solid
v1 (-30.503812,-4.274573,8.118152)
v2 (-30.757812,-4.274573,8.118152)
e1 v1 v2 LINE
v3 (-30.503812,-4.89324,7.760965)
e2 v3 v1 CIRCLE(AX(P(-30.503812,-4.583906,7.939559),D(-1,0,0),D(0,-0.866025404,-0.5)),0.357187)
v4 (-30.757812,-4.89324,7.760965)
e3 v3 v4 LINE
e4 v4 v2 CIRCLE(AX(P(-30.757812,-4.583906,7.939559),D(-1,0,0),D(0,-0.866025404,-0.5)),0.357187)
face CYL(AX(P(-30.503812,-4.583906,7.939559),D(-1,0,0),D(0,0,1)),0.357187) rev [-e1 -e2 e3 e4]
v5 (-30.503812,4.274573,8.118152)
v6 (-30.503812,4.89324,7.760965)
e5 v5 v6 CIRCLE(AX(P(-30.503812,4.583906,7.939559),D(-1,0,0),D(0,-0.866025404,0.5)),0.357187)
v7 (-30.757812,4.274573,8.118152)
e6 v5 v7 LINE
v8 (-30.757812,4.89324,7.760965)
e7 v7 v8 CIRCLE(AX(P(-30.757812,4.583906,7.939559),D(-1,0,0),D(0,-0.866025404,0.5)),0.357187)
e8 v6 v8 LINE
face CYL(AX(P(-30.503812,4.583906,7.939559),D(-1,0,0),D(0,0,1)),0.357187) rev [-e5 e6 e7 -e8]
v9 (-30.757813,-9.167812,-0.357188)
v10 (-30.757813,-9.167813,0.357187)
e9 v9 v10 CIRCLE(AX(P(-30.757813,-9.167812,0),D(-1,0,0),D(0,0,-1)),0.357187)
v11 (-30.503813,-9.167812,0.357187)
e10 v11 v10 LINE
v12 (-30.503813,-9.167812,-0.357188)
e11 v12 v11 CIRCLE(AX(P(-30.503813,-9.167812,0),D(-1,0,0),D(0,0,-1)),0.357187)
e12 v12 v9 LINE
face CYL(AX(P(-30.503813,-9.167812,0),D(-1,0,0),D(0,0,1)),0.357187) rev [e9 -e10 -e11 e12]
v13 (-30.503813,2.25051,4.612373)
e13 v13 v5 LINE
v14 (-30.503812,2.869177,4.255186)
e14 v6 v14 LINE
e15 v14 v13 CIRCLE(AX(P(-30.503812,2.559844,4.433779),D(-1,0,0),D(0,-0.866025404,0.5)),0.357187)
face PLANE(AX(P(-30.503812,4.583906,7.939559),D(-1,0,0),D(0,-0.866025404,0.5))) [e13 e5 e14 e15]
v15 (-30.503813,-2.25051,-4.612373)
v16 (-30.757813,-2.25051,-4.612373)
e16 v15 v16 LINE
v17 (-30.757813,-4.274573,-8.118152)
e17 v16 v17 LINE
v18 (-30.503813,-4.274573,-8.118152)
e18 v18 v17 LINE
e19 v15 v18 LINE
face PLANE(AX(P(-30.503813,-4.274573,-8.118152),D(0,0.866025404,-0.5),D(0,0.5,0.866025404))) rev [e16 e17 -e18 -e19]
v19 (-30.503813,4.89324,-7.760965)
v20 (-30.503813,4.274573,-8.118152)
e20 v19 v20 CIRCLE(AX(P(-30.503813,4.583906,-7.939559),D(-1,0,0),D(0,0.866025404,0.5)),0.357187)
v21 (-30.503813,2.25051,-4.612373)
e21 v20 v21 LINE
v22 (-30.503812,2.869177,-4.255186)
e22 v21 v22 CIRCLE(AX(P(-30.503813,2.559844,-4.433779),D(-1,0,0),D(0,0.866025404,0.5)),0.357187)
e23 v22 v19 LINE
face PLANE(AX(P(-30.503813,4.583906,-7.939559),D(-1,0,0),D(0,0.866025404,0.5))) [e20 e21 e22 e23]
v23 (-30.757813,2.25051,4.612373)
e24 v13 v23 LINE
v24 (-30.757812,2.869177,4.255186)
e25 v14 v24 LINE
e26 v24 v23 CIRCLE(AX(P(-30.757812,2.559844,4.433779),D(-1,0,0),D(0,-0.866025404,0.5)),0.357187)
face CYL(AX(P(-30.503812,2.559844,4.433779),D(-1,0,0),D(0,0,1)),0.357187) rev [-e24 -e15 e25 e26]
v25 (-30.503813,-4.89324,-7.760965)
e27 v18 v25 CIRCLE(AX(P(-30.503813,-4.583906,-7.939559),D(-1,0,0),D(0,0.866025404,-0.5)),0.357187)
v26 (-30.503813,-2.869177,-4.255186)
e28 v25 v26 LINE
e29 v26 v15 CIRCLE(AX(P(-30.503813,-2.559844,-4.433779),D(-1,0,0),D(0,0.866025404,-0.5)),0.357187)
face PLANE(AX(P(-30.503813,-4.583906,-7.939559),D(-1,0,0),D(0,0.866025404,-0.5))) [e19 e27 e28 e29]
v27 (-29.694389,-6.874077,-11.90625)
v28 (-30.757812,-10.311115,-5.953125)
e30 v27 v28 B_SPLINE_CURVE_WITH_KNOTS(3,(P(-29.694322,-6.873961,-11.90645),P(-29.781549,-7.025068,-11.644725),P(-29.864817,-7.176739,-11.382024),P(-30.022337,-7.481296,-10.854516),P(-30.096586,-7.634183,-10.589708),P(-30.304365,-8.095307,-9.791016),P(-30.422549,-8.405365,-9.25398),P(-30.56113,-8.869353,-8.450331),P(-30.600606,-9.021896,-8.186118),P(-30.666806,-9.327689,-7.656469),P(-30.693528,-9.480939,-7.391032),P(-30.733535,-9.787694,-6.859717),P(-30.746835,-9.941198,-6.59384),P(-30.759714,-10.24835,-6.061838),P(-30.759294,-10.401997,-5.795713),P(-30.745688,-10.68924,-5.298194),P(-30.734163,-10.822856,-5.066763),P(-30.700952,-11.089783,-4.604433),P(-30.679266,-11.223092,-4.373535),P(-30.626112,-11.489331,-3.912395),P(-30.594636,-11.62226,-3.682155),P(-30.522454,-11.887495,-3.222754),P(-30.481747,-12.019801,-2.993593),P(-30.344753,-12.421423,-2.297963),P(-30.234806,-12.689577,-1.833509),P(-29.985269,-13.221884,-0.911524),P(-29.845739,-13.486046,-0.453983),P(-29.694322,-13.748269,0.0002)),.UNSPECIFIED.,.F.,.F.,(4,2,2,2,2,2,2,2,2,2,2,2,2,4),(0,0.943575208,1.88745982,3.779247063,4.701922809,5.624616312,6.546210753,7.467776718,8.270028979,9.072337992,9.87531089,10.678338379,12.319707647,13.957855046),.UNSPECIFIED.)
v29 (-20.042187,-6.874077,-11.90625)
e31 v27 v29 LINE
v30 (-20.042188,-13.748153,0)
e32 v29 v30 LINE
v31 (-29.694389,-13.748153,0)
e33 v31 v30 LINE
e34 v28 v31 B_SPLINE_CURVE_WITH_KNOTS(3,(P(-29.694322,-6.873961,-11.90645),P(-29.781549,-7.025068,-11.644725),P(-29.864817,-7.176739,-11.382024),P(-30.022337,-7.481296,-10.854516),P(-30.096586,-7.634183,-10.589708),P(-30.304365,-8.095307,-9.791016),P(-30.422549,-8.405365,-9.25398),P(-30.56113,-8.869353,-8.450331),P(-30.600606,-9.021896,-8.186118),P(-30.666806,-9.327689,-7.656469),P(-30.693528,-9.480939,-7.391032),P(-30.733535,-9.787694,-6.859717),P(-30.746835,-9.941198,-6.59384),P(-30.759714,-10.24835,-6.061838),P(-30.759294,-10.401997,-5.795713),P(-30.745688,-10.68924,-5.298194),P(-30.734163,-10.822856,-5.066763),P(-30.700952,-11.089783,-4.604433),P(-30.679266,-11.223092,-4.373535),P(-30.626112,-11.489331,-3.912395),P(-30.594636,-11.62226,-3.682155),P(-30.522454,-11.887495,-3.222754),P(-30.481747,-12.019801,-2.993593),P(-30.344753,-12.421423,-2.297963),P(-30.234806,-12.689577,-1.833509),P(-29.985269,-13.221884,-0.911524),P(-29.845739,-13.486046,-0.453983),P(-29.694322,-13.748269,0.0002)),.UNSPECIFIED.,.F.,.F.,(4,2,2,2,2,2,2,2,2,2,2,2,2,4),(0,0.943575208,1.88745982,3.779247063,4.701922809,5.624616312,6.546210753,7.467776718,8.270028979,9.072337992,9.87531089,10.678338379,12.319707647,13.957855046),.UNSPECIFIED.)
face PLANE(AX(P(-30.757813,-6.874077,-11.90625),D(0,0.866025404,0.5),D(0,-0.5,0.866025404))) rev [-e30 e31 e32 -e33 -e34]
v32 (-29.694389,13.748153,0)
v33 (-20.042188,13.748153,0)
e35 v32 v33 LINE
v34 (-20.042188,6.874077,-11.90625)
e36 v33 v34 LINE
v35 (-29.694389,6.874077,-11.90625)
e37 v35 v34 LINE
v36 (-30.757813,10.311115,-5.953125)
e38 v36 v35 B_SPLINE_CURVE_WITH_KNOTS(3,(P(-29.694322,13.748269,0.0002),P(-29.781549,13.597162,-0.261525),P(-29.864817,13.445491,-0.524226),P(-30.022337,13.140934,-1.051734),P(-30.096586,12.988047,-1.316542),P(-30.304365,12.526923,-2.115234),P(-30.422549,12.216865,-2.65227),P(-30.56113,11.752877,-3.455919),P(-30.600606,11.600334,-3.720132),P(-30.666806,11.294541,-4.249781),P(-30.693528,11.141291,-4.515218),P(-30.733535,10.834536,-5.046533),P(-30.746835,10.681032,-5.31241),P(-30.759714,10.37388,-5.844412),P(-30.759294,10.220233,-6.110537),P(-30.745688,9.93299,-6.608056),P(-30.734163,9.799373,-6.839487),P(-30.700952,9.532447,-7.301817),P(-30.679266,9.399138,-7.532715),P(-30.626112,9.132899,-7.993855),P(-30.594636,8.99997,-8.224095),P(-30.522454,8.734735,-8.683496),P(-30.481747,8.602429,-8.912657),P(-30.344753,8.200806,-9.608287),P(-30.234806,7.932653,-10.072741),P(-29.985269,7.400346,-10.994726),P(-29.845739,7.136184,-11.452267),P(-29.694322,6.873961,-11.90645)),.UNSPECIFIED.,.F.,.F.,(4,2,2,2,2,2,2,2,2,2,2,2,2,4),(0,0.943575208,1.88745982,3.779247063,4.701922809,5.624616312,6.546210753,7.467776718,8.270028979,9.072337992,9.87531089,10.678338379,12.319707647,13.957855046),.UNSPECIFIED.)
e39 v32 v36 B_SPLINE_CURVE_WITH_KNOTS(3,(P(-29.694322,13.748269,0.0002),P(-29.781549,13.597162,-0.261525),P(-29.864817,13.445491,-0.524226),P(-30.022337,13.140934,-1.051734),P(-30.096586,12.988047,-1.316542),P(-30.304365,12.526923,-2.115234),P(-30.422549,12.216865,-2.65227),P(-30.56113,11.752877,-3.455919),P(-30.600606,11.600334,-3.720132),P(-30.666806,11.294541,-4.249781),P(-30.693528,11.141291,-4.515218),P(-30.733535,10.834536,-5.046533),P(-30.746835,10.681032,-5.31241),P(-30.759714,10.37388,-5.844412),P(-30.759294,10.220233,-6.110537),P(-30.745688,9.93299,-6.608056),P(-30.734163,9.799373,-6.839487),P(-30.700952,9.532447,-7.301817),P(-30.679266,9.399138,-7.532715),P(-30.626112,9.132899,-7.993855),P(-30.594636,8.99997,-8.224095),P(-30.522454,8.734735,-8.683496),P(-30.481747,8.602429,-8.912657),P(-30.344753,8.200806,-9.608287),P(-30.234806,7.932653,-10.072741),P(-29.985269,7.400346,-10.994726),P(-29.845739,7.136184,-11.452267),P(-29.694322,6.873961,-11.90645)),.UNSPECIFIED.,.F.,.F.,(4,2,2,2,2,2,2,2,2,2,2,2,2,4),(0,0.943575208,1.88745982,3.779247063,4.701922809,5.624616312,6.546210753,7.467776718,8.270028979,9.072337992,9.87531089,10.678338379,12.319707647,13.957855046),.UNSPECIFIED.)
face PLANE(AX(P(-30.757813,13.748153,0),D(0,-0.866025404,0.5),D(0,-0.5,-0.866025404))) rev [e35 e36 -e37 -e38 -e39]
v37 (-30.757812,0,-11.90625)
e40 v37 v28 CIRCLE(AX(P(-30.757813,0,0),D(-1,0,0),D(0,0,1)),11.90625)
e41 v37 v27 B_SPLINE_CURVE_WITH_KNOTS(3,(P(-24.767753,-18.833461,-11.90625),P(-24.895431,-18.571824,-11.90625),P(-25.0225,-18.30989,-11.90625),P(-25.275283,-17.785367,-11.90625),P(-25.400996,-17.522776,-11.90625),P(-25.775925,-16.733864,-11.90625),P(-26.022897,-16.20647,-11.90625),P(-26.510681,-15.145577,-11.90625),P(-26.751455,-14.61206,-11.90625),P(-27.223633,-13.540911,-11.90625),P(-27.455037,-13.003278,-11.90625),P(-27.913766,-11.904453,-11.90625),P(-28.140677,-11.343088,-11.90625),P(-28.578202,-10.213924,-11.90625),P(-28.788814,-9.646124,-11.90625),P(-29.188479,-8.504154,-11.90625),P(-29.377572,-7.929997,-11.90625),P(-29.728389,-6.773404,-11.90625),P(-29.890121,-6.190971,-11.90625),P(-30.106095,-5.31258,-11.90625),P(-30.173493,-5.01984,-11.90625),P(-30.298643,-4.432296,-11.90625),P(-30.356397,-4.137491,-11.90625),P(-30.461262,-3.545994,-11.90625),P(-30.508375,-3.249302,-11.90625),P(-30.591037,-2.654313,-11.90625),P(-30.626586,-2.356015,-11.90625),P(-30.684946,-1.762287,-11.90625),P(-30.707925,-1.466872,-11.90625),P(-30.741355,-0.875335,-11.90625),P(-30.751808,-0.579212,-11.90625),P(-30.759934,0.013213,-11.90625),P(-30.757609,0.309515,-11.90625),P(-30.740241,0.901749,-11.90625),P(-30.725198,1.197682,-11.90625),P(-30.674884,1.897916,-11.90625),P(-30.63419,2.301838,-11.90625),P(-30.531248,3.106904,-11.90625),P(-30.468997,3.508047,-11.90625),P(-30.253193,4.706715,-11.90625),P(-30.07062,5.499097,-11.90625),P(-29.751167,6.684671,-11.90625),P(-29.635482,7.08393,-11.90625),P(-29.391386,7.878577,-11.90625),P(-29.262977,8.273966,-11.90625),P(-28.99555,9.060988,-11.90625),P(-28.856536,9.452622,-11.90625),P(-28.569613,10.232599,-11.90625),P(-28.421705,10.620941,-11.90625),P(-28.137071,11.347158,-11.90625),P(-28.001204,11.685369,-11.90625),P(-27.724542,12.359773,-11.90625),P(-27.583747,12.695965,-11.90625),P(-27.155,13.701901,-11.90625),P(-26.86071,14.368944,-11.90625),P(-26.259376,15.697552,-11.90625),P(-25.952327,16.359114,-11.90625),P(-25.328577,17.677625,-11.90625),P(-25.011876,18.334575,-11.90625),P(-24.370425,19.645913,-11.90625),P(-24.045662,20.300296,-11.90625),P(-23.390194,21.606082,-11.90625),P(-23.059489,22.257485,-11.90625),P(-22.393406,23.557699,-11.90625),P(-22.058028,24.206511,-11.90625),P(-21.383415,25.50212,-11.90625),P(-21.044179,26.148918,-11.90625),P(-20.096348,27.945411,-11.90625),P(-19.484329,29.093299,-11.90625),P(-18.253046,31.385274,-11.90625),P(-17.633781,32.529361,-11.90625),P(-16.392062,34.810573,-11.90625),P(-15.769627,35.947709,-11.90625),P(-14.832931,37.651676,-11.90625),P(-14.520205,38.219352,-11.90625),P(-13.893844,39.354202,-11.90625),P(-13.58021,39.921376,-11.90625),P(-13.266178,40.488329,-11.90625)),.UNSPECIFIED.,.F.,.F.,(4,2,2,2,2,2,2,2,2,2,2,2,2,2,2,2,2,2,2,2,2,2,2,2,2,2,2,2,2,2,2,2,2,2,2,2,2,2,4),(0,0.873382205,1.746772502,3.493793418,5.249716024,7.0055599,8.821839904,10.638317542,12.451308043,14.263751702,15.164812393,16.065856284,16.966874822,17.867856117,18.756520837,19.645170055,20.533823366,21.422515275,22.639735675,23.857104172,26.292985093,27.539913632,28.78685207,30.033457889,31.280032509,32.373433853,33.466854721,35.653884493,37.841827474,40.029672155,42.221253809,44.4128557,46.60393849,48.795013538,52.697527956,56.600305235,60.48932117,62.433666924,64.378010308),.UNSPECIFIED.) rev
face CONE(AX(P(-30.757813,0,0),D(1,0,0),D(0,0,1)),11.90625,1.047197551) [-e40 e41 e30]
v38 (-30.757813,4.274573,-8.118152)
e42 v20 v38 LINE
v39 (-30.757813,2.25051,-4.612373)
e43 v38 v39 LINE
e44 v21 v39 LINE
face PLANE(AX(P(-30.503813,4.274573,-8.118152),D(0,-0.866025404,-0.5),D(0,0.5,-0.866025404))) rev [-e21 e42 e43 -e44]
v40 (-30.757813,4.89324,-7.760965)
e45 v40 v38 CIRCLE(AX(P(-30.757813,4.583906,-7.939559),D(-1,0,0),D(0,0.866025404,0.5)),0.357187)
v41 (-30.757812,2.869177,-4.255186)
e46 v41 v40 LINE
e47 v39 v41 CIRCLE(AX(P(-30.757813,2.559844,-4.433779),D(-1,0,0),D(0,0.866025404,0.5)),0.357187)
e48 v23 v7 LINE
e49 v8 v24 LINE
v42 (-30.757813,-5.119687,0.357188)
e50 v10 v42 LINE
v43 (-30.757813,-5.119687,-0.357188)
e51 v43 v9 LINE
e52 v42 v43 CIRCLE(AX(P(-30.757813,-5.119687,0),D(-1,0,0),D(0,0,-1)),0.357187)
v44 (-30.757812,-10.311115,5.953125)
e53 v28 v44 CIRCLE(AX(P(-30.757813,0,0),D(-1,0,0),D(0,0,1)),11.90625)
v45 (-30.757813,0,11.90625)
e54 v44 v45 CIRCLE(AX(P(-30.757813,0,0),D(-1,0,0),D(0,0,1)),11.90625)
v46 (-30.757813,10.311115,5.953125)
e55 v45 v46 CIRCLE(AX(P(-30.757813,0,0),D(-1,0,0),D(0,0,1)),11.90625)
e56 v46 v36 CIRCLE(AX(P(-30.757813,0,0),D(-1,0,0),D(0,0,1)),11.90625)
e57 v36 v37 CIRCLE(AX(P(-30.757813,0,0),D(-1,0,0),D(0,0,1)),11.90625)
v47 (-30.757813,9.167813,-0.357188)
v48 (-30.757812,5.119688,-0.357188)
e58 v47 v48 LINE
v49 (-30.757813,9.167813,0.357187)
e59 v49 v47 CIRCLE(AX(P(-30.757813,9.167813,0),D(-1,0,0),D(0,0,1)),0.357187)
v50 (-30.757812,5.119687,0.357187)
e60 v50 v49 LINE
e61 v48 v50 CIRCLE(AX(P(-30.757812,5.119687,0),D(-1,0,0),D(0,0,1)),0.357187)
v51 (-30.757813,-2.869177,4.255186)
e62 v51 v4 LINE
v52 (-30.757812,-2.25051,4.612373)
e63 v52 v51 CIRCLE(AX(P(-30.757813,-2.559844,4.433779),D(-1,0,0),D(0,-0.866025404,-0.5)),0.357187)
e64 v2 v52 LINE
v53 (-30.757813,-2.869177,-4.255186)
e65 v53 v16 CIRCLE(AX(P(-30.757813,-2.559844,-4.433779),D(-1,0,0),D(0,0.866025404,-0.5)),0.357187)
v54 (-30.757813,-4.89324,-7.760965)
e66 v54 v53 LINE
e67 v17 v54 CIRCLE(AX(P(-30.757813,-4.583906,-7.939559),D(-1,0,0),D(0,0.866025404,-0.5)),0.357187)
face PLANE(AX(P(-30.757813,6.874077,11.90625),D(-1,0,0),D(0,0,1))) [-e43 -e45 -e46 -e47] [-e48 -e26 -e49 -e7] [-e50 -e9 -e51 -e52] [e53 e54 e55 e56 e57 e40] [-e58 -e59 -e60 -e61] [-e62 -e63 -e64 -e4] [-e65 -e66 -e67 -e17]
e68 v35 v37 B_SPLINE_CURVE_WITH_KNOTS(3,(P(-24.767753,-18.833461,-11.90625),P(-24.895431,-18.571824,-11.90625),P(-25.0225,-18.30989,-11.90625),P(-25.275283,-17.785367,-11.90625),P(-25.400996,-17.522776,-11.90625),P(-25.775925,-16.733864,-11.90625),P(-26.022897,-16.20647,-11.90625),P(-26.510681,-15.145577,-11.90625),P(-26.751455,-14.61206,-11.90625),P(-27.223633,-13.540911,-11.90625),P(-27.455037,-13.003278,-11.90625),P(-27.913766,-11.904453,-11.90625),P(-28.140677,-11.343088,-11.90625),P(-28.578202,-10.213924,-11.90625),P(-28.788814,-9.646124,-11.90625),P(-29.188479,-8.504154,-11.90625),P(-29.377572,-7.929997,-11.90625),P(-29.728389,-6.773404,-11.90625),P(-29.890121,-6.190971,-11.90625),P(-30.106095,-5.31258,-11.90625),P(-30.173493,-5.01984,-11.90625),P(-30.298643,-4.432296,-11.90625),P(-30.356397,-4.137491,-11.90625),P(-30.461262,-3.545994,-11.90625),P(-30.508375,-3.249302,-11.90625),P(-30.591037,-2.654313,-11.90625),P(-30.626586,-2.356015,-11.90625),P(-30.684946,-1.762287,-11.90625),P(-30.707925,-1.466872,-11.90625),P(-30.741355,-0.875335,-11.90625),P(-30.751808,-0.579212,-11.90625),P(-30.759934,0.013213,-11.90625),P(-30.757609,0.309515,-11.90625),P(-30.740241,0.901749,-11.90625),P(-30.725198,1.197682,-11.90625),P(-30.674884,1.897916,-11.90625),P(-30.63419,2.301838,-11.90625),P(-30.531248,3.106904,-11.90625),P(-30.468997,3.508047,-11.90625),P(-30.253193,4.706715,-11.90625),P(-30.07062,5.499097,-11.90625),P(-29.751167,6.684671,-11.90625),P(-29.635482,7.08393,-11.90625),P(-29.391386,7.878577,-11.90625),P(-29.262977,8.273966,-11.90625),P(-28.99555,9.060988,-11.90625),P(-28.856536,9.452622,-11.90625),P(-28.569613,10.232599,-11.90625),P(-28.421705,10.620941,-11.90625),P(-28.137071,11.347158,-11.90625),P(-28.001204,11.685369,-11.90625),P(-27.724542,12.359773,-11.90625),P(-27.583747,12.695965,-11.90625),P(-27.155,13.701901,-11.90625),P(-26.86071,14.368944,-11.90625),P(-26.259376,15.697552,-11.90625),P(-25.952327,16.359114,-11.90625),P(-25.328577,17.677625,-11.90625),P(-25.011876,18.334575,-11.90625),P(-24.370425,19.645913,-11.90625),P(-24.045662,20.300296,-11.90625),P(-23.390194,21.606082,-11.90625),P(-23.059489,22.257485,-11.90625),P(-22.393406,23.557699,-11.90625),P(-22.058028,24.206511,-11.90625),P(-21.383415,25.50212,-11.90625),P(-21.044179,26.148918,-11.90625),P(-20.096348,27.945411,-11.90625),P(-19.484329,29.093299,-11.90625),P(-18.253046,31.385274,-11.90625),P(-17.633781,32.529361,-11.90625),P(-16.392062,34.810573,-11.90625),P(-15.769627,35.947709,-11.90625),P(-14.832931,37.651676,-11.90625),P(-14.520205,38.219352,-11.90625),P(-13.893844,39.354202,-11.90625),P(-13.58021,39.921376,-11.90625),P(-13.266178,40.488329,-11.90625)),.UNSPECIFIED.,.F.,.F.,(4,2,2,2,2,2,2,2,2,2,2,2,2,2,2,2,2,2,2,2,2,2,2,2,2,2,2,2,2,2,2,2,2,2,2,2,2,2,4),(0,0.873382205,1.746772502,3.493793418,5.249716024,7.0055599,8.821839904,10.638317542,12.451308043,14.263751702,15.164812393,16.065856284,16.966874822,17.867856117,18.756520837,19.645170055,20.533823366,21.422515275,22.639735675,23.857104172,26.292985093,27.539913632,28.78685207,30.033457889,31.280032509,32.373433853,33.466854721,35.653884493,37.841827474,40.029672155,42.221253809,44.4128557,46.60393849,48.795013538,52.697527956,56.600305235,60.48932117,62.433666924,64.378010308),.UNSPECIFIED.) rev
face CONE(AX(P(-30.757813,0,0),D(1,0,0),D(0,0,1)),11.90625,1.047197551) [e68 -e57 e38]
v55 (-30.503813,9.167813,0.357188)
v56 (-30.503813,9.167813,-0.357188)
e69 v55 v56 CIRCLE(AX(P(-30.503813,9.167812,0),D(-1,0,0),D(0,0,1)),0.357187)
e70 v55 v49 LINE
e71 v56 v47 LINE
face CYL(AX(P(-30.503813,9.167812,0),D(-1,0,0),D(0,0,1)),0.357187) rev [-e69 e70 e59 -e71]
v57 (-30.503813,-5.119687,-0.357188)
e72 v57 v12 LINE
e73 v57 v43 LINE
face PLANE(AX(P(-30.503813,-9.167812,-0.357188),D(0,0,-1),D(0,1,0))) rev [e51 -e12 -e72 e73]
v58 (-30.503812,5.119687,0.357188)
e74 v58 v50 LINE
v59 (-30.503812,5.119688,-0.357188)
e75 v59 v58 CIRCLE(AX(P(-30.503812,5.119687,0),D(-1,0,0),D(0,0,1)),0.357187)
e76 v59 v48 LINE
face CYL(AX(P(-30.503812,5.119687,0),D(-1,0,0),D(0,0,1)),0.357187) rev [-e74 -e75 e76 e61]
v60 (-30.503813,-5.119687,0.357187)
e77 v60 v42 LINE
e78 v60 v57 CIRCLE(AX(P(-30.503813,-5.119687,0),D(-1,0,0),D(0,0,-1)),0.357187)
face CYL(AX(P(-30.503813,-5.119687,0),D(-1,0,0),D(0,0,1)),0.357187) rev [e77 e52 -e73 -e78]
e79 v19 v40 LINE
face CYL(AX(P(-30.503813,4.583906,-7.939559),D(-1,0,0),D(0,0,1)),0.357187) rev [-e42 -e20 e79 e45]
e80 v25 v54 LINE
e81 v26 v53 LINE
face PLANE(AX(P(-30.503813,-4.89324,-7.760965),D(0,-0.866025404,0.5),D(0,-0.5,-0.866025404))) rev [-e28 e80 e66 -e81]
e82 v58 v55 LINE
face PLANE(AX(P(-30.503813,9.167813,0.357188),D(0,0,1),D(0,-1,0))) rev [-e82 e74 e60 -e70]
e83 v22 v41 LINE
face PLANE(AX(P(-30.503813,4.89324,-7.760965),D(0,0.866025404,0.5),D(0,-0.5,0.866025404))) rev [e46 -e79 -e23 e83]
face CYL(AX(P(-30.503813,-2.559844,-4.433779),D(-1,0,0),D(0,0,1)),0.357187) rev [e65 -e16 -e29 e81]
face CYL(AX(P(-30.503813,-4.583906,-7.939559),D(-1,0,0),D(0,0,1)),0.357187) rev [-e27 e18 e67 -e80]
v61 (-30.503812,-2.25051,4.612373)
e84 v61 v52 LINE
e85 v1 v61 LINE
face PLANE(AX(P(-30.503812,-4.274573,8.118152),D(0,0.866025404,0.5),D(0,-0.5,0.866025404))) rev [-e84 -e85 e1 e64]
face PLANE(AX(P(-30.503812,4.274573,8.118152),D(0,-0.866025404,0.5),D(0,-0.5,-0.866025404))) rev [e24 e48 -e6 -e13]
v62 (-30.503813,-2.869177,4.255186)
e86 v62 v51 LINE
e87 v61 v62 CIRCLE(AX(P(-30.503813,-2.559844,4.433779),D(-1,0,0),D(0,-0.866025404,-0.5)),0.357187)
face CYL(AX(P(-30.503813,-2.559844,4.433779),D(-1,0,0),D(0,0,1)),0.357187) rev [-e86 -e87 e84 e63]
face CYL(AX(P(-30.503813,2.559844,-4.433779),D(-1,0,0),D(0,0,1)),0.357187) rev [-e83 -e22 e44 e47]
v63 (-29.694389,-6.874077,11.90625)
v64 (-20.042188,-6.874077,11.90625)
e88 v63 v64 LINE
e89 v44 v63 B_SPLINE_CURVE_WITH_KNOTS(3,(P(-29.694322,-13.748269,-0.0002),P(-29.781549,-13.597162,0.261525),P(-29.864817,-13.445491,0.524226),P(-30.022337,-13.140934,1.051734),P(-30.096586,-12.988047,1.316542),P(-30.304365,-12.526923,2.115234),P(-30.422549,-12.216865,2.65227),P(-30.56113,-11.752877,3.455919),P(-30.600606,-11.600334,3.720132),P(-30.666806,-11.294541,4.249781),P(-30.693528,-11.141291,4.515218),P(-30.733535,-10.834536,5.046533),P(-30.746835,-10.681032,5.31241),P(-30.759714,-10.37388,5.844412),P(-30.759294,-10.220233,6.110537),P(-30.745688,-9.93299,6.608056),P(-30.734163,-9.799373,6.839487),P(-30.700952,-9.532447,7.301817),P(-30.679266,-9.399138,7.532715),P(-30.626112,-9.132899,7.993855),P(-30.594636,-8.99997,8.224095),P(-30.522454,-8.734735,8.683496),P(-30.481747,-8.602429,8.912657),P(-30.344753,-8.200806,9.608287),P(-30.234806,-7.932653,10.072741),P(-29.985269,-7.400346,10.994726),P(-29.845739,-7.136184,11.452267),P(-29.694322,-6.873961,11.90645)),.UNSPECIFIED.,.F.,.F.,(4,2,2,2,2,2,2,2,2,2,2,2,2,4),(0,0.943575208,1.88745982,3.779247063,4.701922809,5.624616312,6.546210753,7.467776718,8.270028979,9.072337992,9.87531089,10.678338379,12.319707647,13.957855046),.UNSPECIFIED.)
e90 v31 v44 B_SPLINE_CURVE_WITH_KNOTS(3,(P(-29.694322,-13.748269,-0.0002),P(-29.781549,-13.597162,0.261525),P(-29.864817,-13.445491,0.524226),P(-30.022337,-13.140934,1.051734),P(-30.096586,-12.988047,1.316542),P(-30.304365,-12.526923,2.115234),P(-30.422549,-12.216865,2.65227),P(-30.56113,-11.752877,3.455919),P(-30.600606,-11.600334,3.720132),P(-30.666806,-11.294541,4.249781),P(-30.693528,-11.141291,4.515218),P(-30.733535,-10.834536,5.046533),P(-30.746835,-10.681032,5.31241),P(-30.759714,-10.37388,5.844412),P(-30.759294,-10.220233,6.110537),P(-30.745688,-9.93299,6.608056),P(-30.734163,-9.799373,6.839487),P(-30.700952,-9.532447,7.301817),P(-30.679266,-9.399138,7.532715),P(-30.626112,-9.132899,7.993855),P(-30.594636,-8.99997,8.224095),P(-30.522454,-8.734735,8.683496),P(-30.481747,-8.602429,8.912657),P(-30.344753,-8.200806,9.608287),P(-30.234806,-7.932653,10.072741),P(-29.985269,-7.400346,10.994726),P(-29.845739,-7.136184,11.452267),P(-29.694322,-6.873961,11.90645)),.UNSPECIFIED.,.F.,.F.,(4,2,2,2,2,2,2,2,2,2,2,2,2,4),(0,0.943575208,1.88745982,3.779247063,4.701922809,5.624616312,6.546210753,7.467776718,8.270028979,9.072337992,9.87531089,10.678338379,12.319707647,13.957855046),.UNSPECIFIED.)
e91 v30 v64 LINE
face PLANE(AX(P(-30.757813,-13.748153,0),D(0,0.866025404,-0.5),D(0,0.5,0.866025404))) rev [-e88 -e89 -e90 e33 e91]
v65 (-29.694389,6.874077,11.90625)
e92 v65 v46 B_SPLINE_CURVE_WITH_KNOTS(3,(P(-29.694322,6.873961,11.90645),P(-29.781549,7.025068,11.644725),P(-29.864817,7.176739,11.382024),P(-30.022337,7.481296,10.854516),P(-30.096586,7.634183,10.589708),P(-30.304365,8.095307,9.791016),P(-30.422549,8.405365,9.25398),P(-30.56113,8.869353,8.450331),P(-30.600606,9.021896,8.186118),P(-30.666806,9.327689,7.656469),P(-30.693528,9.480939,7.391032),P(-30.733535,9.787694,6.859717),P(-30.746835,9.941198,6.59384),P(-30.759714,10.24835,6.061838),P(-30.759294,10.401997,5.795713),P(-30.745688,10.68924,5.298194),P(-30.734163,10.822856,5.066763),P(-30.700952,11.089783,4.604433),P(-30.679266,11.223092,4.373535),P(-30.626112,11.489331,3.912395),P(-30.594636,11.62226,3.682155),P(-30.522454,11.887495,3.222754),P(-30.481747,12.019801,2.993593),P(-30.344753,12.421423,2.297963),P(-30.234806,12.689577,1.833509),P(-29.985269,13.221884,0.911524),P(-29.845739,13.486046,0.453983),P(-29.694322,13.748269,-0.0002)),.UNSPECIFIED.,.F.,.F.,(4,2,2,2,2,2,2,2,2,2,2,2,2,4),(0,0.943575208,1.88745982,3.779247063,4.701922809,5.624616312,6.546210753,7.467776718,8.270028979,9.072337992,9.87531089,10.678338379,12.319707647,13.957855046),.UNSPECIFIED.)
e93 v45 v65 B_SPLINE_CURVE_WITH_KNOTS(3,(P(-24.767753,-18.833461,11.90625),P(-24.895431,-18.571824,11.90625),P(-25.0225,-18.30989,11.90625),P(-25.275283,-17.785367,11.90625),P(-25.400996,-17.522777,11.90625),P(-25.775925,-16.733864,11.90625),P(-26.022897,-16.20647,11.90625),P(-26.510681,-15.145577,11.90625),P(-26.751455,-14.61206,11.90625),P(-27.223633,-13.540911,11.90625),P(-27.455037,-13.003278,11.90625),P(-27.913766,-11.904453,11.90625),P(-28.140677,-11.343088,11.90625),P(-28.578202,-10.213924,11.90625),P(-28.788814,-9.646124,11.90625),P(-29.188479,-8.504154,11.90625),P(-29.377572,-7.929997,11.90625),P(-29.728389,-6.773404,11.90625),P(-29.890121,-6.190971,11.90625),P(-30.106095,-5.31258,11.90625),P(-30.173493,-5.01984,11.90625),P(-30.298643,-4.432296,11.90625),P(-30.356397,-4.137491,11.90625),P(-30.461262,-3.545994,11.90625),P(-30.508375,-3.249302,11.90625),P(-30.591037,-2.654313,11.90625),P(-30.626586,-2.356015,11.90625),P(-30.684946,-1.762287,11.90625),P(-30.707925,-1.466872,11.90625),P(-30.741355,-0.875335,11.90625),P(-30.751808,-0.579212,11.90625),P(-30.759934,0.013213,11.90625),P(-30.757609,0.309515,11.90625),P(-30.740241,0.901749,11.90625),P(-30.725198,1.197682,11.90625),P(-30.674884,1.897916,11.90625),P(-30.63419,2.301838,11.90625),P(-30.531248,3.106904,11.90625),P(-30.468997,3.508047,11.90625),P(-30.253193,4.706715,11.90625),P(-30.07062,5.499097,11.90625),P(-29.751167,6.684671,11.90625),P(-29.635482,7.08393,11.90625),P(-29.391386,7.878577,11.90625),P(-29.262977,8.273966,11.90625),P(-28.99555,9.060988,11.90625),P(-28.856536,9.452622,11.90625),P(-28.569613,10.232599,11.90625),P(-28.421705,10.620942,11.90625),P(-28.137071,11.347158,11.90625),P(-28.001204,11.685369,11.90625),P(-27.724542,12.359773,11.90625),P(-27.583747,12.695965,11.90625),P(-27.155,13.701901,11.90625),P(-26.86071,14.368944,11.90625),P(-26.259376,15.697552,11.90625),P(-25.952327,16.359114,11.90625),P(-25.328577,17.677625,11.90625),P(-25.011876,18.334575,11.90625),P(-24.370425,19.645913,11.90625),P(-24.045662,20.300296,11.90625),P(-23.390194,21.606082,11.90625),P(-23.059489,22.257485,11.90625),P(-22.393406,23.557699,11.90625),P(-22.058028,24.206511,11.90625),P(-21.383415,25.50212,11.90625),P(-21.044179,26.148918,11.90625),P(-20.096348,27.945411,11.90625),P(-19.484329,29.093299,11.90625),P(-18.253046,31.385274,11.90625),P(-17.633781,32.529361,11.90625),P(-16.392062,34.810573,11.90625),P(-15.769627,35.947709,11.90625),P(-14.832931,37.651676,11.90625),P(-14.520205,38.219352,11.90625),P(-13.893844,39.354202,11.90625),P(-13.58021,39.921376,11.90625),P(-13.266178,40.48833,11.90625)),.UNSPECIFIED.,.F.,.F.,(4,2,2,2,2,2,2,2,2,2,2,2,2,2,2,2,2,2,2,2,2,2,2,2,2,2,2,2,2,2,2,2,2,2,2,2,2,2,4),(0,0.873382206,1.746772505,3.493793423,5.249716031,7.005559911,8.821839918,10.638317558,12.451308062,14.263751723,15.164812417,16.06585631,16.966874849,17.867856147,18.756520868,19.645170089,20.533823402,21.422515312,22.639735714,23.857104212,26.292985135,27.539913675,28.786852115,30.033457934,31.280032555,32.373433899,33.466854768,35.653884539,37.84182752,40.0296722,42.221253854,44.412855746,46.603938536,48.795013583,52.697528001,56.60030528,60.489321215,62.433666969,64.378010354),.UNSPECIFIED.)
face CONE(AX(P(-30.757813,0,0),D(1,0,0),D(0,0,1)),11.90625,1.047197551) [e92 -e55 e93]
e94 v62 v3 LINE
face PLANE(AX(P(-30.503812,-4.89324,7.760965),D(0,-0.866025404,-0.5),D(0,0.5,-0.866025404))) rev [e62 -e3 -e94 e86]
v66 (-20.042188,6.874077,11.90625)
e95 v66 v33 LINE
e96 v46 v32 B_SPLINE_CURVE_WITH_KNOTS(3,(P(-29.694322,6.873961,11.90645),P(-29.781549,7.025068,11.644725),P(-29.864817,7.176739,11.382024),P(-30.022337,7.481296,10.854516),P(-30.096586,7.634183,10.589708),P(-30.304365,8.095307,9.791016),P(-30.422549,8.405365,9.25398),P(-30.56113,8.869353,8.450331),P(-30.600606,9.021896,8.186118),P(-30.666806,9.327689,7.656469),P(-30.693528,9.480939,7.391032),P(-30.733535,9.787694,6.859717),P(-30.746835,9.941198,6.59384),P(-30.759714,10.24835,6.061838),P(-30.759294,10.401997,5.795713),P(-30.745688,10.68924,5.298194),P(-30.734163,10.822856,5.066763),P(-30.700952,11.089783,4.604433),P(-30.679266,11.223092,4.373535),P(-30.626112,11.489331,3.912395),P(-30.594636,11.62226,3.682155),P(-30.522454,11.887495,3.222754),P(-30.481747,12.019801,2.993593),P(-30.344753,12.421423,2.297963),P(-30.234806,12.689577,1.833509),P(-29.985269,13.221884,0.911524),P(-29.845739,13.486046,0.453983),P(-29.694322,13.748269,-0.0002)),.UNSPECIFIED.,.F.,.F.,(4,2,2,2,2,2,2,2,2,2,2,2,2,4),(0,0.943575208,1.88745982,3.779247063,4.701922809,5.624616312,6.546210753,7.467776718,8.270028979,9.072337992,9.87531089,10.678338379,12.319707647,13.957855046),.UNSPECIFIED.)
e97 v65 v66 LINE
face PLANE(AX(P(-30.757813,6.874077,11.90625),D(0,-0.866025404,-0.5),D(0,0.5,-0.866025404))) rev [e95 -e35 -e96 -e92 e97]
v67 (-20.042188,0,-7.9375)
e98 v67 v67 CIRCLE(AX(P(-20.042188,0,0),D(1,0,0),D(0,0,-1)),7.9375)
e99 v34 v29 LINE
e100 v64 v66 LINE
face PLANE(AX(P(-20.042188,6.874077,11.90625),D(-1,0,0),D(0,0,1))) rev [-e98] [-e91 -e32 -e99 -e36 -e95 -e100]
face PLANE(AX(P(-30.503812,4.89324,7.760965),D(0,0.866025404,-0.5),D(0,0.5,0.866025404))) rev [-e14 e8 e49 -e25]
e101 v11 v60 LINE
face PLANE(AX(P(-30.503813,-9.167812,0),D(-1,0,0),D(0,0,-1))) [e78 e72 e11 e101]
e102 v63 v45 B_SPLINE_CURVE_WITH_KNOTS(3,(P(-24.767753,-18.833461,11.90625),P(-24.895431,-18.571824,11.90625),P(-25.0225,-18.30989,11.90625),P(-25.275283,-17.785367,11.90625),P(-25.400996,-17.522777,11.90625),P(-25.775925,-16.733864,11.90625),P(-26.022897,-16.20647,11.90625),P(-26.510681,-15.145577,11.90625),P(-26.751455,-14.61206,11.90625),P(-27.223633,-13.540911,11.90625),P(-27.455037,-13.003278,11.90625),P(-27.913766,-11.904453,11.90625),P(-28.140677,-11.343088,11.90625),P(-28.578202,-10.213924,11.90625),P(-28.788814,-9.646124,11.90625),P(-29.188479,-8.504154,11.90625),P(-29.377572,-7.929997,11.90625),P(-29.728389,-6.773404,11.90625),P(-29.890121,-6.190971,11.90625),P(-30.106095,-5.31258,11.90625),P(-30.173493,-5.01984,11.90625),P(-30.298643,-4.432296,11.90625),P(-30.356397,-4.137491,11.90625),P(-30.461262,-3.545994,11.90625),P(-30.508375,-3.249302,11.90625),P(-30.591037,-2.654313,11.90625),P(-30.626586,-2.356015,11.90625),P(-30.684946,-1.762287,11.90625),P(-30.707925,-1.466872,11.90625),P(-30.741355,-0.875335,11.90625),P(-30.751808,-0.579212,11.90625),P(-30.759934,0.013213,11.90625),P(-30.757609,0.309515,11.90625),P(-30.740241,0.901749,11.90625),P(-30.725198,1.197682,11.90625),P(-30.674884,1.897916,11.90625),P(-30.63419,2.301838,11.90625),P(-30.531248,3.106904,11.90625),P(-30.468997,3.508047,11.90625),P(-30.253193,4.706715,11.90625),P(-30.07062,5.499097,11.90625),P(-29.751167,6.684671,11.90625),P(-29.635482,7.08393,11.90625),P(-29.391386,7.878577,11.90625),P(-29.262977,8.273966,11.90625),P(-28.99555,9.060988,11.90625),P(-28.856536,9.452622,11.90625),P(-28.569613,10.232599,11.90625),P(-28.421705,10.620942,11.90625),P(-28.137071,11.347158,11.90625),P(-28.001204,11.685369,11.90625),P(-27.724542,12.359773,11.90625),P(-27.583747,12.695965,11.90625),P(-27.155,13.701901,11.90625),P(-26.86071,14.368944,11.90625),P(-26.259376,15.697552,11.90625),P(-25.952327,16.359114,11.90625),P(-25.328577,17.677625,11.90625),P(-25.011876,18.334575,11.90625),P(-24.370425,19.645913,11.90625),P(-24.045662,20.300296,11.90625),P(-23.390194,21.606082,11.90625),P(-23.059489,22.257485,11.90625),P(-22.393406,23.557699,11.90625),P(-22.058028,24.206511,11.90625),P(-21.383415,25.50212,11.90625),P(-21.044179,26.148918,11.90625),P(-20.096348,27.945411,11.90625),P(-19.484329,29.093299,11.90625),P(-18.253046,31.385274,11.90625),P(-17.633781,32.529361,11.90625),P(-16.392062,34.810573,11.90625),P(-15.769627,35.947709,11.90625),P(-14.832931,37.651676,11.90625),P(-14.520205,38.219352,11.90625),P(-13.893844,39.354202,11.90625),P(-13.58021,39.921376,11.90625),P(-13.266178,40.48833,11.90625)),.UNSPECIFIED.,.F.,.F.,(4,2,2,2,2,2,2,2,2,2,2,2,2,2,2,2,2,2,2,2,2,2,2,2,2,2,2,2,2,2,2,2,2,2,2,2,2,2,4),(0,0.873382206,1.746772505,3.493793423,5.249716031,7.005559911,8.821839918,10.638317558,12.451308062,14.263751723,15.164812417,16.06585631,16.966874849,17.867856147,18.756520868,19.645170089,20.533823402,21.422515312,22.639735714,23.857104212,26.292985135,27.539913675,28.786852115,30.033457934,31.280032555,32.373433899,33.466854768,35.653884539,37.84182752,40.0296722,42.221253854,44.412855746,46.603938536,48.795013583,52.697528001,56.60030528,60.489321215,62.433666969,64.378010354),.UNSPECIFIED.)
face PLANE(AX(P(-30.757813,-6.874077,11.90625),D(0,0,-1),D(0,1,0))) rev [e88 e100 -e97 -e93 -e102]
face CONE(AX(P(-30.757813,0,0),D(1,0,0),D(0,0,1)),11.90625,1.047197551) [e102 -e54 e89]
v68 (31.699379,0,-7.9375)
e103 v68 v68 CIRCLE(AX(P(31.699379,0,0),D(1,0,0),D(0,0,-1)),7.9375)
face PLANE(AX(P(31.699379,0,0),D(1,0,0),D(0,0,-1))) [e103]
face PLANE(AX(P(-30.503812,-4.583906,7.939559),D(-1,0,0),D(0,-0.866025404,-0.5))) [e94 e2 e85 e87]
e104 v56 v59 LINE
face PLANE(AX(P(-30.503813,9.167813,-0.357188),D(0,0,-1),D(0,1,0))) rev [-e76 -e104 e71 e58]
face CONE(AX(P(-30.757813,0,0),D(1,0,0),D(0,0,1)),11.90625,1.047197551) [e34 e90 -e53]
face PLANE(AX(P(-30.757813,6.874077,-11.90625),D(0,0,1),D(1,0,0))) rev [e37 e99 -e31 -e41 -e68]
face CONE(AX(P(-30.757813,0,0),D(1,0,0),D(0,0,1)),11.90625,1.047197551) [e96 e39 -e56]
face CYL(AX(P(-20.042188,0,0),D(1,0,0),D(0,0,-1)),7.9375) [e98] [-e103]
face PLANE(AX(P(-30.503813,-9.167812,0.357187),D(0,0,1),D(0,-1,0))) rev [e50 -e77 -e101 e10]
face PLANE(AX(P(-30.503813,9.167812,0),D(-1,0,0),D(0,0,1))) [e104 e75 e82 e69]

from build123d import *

# Parameters (mm, degrees)
SKETCH5_R           = 7.9375
BOSS_EXTRUDE3_DEPTH = 50.8
CHAMFER1_SIZE       = 1.731818182
CUT_SWEEP1_PITCH    = 2.309090909
BOSS_EXTRUDE4_DEPTH = 10.715625
SKETCH8_OUTSIDE_W   = 265.784
SKETCH8_OUTSIDE_H   = 269.468
SKETCH8_OUTSIDE_R   = 11.90625
CUT_EXTRUDE3_DEPTH  = 65.147818703
CUT_EXTRUDE3_DRAFT  = -60
CUT_EXTRUDE4_DEPTH  = 0.254
CIRPATTERN1_COUNT   = 6
SKETCH13_R          = 7.9375
BOSS_EXTRUDE5_DEPTH = 51.741567


with BuildPart() as part:
    # Sketch5 → Boss-Extrude3 (new body)
    with BuildSketch(Plane(origin=(30.7578125, 0, 0), x_dir=(0, 0, -1), z_dir=(1, 0, 0))):
        Circle(SKETCH5_R)
    extrude(amount=-BOSS_EXTRUDE3_DEPTH)

    # Chamfer1
    chamfer1_edges = [part.edges().sort_by_distance(p)[0] for p in [
        (30.7578125, 0, 7.9375),
    ]]
    chamfer(chamfer1_edges, length=CHAMFER1_SIZE)

    # Cut-Sweep1: arcs per turn and ends read off the stored shape
    # Cut-Sweep1: the profile of Sketch10 profile screwed along a right-hand helix through 23 turns, 10 arcs to a turn; built about Z, then put on its axis
    cut_sweep1_z = Axis((0, 0, 0), (0, 0, 1))
    cut_sweep1_corners = [(7.9378, 0, 0.000173205), (6.43770146, 0, -0.865909091), (6.43770146, 0, -1.154545455), (7.9378, 0, -2.020627751)]
    with BuildLine(mode=Mode.PRIVATE) as cut_sweep1_profile:
        Line(cut_sweep1_corners[0], cut_sweep1_corners[1])
        Line(cut_sweep1_corners[1], cut_sweep1_corners[2])
        Line(cut_sweep1_corners[2], cut_sweep1_corners[3])
        Line(cut_sweep1_corners[3], cut_sweep1_corners[0])
    cut_sweep1_cap = Face(cut_sweep1_profile.wire())
    cut_sweep1_turn_angles = [0, 18, 36, 54, 72, 90, 108, 126, 144, 162, 180, 198, 216, 234, 252, 270, 288, 306, 324, 342, 360]
    cut_sweep1_turn_weights = [1, 0.9510565162951535, 1, 0.9510565162951535, 1, 0.9510565162951535, 1, 0.9510565162951535, 1, 0.9510565162951535, 1, 0.9510565162951535, 1, 0.9510565162951535, 1, 0.9510565162951535, 1, 0.9510565162951535, 1, 0.9510565162951535, 1]
    cut_sweep1_turn_rails = [Edge.make_bspline([Vector(p[0], p[1], 0).rotate(cut_sweep1_z, cut_sweep1_turn_angles[k]) / cut_sweep1_turn_weights[k] + Vector(0, 0, p[2] + CUT_SWEEP1_PITCH * cut_sweep1_turn_angles[k] / 360) for k in range(21)], [0, 0, 0, 1, 1, 2, 2, 3, 3, 4, 4, 5, 5, 6, 6, 7, 7, 8, 8, 9, 9, 10, 10, 10], 2, cut_sweep1_turn_weights) for p in cut_sweep1_corners]
    cut_sweep1_turn_sides = [Face.make_surface_from_curves(cut_sweep1_turn_rails[p[0]], cut_sweep1_turn_rails[p[1]]) for p in [(0, 1), (1, 2), (2, 3), (3, 0)]]
    cut_sweep1 = Plane(origin=(30.7578125, 0, 0), x_dir=(0, 1, 0), z_dir=(-1, 0, 0)) * Solid(Shell([*[p.moved(Location((0, 0, CUT_SWEEP1_PITCH * i))) for i in range(23) for p in cut_sweep1_turn_sides], cut_sweep1_cap, cut_sweep1_cap.rotate(cut_sweep1_z, 8280).moved(Location((0, 0, CUT_SWEEP1_PITCH * 8280 / 360)))]))
    add(cut_sweep1, mode=Mode.SUBTRACT)

    # Sketch6 → Boss-Extrude4 (add)
    with BuildSketch(Plane.ZY.offset(20.0421875)):
        Polygon((11.90625, 6.874076643), (0, 13.748153285), (-11.90625, 6.874076643), (-11.90625, -6.874076643), (0, -13.748153285), (11.90625, -6.874076643), align=None)
    extrude(amount=BOSS_EXTRUDE4_DEPTH)


with BuildPart() as cut_extrude3_tool:
    # Sketch8 outside → Cut-Extrude3 (with draft: the straight prism first)
    with BuildSketch(Plane.ZY.offset(30.7578125)):
        Rectangle(SKETCH8_OUTSIDE_W, SKETCH8_OUTSIDE_H)
        Circle(SKETCH8_OUTSIDE_R, mode=Mode.SUBTRACT)
    extrude(amount=-CUT_EXTRUDE3_DEPTH)
    # Cut-Extrude3: the draft: its side faces are tilted about the plane it starts from
    cut_extrude3_sides = [cut_extrude3_tool.faces().sort_by_distance(p)[0] for p in [
        (1.816096852, -134.734, 0),
        (1.816096852, 0, 132.892),
        (1.816096852, 134.734, 0),
        (1.816096852, 0, -132.892),
        (1.816096852, 0, -11.90625),
    ]]
    draft(cut_extrude3_sides, Plane.ZY.offset(30.7578125), CUT_EXTRUDE3_DRAFT)


with BuildPart() as part_1:
    add(part.part)

    # Cut-Extrude3: cut by cut_extrude3_tool
    add(cut_extrude3_tool.part, mode=Mode.SUBTRACT)

    # Sketch12 → Cut-Extrude4 (cut)
    with BuildSketch(Plane.ZY.offset(30.7578125)):
        with BuildLine():
            Line((0.3571875, 9.1678125), (0.3571875, 5.1196875))
            ThreePointArc((0.3571875, 5.1196875), (0, 4.7625), (-0.3571875, 5.1196875))
            Line((-0.3571875, 5.1196875), (-0.3571875, 9.1678125))
            ThreePointArc((-0.3571875, 9.1678125), (0, 9.525), (0.3571875, 9.1678125))
        make_face()
    cut_extrude4 = extrude(amount=-CUT_EXTRUDE4_DEPTH, mode=Mode.SUBTRACT)

    # CirPattern1: Cut-Extrude4 ×6 about axis
    cirpattern1_axis = Axis((0, 0, 0), (1, 0, 0))
    for i in range(1, CIRPATTERN1_COUNT):
        add(cut_extrude4.rotate(cirpattern1_axis, i * 360 / CIRPATTERN1_COUNT), mode=Mode.SUBTRACT)

    # Sketch13 → Boss-Extrude5 (add)
    with BuildSketch(Plane(origin=(-20.0421875, 0, 0), x_dir=(0, 0, -1), z_dir=(1, 0, 0))):
        Circle(SKETCH13_R)
    extrude(amount=BOSS_EXTRUDE5_DEPTH)


solid = part_1.part
